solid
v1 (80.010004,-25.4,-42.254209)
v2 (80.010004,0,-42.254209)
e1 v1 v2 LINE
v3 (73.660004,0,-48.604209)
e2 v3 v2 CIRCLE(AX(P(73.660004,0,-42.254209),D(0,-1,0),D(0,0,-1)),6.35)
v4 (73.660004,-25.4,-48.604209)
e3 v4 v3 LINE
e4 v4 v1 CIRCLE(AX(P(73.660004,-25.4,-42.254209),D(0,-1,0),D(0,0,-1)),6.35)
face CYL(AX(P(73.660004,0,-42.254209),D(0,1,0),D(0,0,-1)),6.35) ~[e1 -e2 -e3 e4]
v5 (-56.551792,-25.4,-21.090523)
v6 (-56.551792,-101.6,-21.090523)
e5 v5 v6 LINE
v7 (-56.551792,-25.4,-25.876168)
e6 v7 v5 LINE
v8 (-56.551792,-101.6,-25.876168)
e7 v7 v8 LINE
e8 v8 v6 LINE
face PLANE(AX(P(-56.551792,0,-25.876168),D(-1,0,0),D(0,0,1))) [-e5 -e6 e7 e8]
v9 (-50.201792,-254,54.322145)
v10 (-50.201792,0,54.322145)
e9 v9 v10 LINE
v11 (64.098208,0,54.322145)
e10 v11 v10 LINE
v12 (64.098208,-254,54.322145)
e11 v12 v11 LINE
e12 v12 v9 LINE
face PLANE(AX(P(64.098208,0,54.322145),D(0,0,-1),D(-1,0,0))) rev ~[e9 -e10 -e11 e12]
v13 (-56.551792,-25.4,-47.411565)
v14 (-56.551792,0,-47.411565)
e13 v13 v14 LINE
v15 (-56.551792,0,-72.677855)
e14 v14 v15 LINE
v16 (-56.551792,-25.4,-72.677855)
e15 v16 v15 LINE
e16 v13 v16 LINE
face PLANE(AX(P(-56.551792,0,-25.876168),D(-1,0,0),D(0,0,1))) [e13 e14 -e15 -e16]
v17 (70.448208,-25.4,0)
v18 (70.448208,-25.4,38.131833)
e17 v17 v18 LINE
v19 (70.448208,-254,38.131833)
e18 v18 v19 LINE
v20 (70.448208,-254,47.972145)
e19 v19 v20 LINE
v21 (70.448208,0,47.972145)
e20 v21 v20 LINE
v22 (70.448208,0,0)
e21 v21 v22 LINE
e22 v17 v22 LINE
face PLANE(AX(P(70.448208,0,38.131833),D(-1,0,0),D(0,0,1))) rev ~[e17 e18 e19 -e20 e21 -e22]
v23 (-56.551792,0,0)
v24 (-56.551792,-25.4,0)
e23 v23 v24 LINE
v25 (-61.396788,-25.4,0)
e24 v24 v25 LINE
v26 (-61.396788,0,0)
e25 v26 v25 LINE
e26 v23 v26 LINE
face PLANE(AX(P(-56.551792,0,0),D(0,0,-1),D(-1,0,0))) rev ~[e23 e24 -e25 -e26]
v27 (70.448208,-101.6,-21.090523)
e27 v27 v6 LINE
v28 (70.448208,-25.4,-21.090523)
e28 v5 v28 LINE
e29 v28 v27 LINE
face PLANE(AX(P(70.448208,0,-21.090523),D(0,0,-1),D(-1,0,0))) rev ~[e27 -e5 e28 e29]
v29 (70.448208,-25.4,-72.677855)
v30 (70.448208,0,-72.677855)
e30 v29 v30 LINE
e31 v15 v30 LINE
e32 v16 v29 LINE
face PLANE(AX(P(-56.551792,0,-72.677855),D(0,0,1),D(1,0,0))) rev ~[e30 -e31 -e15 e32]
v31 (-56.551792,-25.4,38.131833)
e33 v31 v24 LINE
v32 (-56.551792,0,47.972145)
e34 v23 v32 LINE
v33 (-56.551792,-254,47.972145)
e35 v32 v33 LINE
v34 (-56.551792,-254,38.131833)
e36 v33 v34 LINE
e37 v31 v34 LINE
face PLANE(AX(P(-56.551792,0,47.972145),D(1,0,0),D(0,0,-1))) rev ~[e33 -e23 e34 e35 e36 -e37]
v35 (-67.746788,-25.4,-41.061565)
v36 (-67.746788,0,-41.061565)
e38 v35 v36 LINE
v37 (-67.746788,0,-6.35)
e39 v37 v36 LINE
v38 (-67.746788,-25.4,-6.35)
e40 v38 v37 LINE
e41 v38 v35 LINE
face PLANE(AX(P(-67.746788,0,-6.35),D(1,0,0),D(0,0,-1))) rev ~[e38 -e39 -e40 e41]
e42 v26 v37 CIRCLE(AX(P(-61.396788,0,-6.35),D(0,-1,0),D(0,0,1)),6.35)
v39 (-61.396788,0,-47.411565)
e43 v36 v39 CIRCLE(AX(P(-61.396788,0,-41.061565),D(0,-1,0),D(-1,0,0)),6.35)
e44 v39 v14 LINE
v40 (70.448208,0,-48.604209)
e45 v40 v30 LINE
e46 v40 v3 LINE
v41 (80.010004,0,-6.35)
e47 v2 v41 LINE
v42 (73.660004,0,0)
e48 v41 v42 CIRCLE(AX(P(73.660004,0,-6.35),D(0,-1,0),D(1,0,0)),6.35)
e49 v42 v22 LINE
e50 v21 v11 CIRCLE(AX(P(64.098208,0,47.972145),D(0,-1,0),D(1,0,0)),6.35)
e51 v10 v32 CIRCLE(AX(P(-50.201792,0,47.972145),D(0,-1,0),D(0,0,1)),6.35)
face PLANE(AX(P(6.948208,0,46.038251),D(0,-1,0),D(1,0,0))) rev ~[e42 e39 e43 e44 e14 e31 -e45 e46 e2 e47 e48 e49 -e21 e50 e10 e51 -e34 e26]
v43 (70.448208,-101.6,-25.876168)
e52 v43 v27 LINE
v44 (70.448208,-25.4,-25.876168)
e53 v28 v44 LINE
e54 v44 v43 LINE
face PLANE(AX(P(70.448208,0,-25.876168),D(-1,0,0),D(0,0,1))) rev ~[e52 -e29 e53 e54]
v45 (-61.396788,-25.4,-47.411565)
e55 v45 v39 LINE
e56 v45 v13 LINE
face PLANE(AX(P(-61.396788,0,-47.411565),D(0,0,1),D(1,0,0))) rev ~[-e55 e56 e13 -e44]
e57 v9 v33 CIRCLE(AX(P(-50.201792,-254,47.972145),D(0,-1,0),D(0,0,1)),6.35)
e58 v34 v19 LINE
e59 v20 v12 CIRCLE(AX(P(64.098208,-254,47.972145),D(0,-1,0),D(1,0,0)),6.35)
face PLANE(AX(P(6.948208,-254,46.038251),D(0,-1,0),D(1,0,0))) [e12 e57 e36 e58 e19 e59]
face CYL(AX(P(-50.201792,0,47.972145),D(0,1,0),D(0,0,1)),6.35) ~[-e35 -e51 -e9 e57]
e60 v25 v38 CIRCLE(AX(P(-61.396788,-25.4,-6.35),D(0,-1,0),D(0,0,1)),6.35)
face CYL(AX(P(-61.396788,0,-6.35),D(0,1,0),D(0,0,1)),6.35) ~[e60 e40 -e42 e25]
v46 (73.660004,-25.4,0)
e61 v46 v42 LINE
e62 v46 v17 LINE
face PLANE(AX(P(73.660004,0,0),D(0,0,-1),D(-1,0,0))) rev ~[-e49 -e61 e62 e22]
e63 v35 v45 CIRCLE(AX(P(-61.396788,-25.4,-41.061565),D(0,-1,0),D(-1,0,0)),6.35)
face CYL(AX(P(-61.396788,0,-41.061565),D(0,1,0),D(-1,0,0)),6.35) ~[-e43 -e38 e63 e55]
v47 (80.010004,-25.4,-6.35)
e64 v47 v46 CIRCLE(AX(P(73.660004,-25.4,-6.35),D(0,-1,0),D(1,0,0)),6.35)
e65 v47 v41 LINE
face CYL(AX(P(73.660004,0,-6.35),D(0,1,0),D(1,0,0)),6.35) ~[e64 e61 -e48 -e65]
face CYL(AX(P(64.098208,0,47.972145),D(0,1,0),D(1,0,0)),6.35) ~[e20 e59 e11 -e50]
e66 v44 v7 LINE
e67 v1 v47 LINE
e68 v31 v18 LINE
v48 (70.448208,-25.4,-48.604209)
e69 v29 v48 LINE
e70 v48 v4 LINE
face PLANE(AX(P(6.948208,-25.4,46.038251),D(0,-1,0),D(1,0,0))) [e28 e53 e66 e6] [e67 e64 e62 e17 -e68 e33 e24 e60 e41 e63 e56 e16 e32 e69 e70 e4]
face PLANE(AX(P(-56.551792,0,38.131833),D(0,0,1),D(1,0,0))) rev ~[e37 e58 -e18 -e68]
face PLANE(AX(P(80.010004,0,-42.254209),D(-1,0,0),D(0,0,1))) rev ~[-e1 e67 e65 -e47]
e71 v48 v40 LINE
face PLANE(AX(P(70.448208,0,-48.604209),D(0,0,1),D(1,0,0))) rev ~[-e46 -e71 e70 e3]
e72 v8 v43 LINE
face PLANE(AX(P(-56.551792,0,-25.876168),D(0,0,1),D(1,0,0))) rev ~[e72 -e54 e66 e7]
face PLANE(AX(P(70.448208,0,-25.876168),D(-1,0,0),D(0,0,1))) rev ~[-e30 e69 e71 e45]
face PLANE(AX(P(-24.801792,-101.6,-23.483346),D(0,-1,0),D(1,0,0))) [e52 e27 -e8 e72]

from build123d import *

# Parameters (mm, degrees)
F1_DEPTH  = 12.7
F0_W      = 63.5
F0_H      = 4.7856457531
F2_DEPTH  = 101.6
F3_DEPTH  = 254
F1_FACE_W = 127
F1_FACE_H = 46.801686123
F4_DEPTH  = 2.54
F6_DEPTH  = 25.4


# Not quite as in the source:
# - a feature of the source that left no trace in its solid (it failed there, or was rolled back) is left out


with BuildPart() as f1:
    # F0 (on Front) → F1 (new body)
    with BuildSketch(Plane.XZ):
        Polygon((6.9482082725, -25.8761684795), (-56.5517917275, -25.8761684795), (-56.5517917275, -47.4115650554), (-56.5517917275, -72.6778546025), (6.9482082725, -72.6778546025), align=None)
        Polygon((70.4482082725, -25.8761684795), (6.9482082725, -25.8761684795), (6.9482082725, -72.6778546025), (70.4482082725, -72.6778546025), (70.4482082725, -48.604208976), align=None)
    extrude(amount=F1_DEPTH)

    # F0 (on Front) → F2 (join)
    with BuildSketch(Plane.XZ):
        with Locations((-24.8017917275, -23.4833456029)):
            Rectangle(F0_W, F0_H)
        with Locations((38.6982082725, -23.4833456029)):
            Rectangle(F0_W, F0_H)
    extrude(amount=F2_DEPTH)

    # F0 (on Front) + F1_face (on face) → F4 (join)
    with BuildSketch(Plane.XZ):
        with BuildLine():
            Line((73.6600043416, 0), (70.4482082725, 0))
            Line((70.4482082725, 0), (70.4482082725, -21.0905227264))
            Line((70.4482082725, -21.0905227264), (70.4482082725, -25.8761684795))
            Line((70.4482082725, -25.8761684795), (70.4482082725, -48.604208976))
            Line((70.4482082725, -48.604208976), (73.6600043416, -48.604208976))
            ThreePointArc((73.6600043416, -48.604208976), (78.1501324021, -46.7443370366), (80.0100043416, -42.254208976))
            Line((80.0100043416, -42.254208976), (80.0100043416, -6.35))
            ThreePointArc((80.0100043416, -6.35), (78.1501324021, -1.8598719395), (73.6600043416, 0))
        make_face()
        with BuildLine():
            Line((-56.5517917275, -21.0905227264), (-56.5517917275, 0))
            Line((-56.5517917275, 0), (-61.3967882633, 0))
            ThreePointArc((-61.3967882633, 0), (-65.8869163239, -1.8598719395), (-67.7467882633, -6.35))
            Line((-67.7467882633, -6.35), (-67.7467882633, -41.0615650554))
            ThreePointArc((-67.7467882633, -41.0615650554), (-65.8869163239, -45.551693116), (-61.3967882633, -47.4115650554))
            Line((-61.3967882633, -47.4115650554), (-56.5517917275, -47.4115650554))
            Line((-56.5517917275, -47.4115650554), (-56.5517917275, -25.8761684795))
            Line((-56.5517917275, -25.8761684795), (-56.5517917275, -21.0905227264))
        make_face()
    with BuildSketch(Plane(origin=(6.9482082725, -12.7, -49.277011541), x_dir=(1, 0, 0), z_dir=(0, -1, 0))):
        Rectangle(F1_FACE_W, F1_FACE_H)
    extrude(amount=F4_DEPTH)



with BuildPart() as f3:
    # F0 (on Front) → F3 (new body)
    with BuildSketch(Plane.XZ):
        with BuildLine():
            ThreePointArc((-50.2017917275, 54.3221453975), (-54.6919197881, 52.462273458), (-56.5517917275, 47.9721453975))
            Line((-56.5517917275, 47.9721453975), (-56.5517917275, 38.1318327586))
            Line((-56.5517917275, 38.1318327586), (70.4482082725, 38.1318327586))
            Line((70.4482082725, 38.1318327586), (70.4482082725, 47.9721453975))
            ThreePointArc((70.4482082725, 47.9721453975), (68.588336333, 52.462273458), (64.0982082725, 54.3221453975))
            Line((64.0982082725, 54.3221453975), (-50.2017917275, 54.3221453975))
        make_face()
    extrude(amount=F3_DEPTH)


with BuildPart() as f1_1:
    add(f1.part)

    add(f3.part)  # F6 merges F3
    # F0 (on Front) → F6 (join)
    with BuildSketch(Plane.XZ):
        with BuildLine():
            ThreePointArc((-50.2017917275, 54.3221453975), (-54.6919197881, 52.462273458), (-56.5517917275, 47.9721453975))
            Line((-56.5517917275, 47.9721453975), (-56.5517917275, 38.1318327586))
            Line((-56.5517917275, 38.1318327586), (70.4482082725, 38.1318327586))
            Line((70.4482082725, 38.1318327586), (70.4482082725, 47.9721453975))
            ThreePointArc((70.4482082725, 47.9721453975), (68.588336333, 52.462273458), (64.0982082725, 54.3221453975))
            Line((64.0982082725, 54.3221453975), (-50.2017917275, 54.3221453975))
        make_face()
        Polygon((70.4482082725, 38.1318327586), (-56.5517917275, 38.1318327586), (-56.5517917275, 0), (-56.5517917275, -21.0905227264), (6.9482082725, -21.0905227264), (70.4482082725, -21.0905227264), (70.4482082725, 0), align=None)
        with BuildLine():
            Line((-56.5517917275, -21.0905227264), (-56.5517917275, 0))
            Line((-56.5517917275, 0), (-61.3967882633, 0))
            ThreePointArc((-61.3967882633, 0), (-65.8869163239, -1.8598719395), (-67.7467882633, -6.35))
            Line((-67.7467882633, -6.35), (-67.7467882633, -41.0615650554))
            ThreePointArc((-67.7467882633, -41.0615650554), (-65.8869163239, -45.551693116), (-61.3967882633, -47.4115650554))
            Line((-61.3967882633, -47.4115650554), (-56.5517917275, -47.4115650554))
            Line((-56.5517917275, -47.4115650554), (-56.5517917275, -25.8761684795))
            Line((-56.5517917275, -25.8761684795), (-56.5517917275, -21.0905227264))
        make_face()
        with BuildLine():
            Line((73.6600043416, 0), (70.4482082725, 0))
            Line((70.4482082725, 0), (70.4482082725, -21.0905227264))
            Line((70.4482082725, -21.0905227264), (70.4482082725, -25.8761684795))
            Line((70.4482082725, -25.8761684795), (70.4482082725, -48.604208976))
            Line((70.4482082725, -48.604208976), (73.6600043416, -48.604208976))
            ThreePointArc((73.6600043416, -48.604208976), (78.1501324021, -46.7443370366), (80.0100043416, -42.254208976))
            Line((80.0100043416, -42.254208976), (80.0100043416, -6.35))
            ThreePointArc((80.0100043416, -6.35), (78.1501324021, -1.8598719395), (73.6600043416, 0))
        make_face()
        Polygon((6.9482082725, -25.8761684795), (-56.5517917275, -25.8761684795), (-56.5517917275, -47.4115650554), (-56.5517917275, -72.6778546025), (6.9482082725, -72.6778546025), align=None)
        Polygon((70.4482082725, -25.8761684795), (6.9482082725, -25.8761684795), (6.9482082725, -72.6778546025), (70.4482082725, -72.6778546025), (70.4482082725, -48.604208976), align=None)
    extrude(amount=F6_DEPTH)


solid = f1_1.part
